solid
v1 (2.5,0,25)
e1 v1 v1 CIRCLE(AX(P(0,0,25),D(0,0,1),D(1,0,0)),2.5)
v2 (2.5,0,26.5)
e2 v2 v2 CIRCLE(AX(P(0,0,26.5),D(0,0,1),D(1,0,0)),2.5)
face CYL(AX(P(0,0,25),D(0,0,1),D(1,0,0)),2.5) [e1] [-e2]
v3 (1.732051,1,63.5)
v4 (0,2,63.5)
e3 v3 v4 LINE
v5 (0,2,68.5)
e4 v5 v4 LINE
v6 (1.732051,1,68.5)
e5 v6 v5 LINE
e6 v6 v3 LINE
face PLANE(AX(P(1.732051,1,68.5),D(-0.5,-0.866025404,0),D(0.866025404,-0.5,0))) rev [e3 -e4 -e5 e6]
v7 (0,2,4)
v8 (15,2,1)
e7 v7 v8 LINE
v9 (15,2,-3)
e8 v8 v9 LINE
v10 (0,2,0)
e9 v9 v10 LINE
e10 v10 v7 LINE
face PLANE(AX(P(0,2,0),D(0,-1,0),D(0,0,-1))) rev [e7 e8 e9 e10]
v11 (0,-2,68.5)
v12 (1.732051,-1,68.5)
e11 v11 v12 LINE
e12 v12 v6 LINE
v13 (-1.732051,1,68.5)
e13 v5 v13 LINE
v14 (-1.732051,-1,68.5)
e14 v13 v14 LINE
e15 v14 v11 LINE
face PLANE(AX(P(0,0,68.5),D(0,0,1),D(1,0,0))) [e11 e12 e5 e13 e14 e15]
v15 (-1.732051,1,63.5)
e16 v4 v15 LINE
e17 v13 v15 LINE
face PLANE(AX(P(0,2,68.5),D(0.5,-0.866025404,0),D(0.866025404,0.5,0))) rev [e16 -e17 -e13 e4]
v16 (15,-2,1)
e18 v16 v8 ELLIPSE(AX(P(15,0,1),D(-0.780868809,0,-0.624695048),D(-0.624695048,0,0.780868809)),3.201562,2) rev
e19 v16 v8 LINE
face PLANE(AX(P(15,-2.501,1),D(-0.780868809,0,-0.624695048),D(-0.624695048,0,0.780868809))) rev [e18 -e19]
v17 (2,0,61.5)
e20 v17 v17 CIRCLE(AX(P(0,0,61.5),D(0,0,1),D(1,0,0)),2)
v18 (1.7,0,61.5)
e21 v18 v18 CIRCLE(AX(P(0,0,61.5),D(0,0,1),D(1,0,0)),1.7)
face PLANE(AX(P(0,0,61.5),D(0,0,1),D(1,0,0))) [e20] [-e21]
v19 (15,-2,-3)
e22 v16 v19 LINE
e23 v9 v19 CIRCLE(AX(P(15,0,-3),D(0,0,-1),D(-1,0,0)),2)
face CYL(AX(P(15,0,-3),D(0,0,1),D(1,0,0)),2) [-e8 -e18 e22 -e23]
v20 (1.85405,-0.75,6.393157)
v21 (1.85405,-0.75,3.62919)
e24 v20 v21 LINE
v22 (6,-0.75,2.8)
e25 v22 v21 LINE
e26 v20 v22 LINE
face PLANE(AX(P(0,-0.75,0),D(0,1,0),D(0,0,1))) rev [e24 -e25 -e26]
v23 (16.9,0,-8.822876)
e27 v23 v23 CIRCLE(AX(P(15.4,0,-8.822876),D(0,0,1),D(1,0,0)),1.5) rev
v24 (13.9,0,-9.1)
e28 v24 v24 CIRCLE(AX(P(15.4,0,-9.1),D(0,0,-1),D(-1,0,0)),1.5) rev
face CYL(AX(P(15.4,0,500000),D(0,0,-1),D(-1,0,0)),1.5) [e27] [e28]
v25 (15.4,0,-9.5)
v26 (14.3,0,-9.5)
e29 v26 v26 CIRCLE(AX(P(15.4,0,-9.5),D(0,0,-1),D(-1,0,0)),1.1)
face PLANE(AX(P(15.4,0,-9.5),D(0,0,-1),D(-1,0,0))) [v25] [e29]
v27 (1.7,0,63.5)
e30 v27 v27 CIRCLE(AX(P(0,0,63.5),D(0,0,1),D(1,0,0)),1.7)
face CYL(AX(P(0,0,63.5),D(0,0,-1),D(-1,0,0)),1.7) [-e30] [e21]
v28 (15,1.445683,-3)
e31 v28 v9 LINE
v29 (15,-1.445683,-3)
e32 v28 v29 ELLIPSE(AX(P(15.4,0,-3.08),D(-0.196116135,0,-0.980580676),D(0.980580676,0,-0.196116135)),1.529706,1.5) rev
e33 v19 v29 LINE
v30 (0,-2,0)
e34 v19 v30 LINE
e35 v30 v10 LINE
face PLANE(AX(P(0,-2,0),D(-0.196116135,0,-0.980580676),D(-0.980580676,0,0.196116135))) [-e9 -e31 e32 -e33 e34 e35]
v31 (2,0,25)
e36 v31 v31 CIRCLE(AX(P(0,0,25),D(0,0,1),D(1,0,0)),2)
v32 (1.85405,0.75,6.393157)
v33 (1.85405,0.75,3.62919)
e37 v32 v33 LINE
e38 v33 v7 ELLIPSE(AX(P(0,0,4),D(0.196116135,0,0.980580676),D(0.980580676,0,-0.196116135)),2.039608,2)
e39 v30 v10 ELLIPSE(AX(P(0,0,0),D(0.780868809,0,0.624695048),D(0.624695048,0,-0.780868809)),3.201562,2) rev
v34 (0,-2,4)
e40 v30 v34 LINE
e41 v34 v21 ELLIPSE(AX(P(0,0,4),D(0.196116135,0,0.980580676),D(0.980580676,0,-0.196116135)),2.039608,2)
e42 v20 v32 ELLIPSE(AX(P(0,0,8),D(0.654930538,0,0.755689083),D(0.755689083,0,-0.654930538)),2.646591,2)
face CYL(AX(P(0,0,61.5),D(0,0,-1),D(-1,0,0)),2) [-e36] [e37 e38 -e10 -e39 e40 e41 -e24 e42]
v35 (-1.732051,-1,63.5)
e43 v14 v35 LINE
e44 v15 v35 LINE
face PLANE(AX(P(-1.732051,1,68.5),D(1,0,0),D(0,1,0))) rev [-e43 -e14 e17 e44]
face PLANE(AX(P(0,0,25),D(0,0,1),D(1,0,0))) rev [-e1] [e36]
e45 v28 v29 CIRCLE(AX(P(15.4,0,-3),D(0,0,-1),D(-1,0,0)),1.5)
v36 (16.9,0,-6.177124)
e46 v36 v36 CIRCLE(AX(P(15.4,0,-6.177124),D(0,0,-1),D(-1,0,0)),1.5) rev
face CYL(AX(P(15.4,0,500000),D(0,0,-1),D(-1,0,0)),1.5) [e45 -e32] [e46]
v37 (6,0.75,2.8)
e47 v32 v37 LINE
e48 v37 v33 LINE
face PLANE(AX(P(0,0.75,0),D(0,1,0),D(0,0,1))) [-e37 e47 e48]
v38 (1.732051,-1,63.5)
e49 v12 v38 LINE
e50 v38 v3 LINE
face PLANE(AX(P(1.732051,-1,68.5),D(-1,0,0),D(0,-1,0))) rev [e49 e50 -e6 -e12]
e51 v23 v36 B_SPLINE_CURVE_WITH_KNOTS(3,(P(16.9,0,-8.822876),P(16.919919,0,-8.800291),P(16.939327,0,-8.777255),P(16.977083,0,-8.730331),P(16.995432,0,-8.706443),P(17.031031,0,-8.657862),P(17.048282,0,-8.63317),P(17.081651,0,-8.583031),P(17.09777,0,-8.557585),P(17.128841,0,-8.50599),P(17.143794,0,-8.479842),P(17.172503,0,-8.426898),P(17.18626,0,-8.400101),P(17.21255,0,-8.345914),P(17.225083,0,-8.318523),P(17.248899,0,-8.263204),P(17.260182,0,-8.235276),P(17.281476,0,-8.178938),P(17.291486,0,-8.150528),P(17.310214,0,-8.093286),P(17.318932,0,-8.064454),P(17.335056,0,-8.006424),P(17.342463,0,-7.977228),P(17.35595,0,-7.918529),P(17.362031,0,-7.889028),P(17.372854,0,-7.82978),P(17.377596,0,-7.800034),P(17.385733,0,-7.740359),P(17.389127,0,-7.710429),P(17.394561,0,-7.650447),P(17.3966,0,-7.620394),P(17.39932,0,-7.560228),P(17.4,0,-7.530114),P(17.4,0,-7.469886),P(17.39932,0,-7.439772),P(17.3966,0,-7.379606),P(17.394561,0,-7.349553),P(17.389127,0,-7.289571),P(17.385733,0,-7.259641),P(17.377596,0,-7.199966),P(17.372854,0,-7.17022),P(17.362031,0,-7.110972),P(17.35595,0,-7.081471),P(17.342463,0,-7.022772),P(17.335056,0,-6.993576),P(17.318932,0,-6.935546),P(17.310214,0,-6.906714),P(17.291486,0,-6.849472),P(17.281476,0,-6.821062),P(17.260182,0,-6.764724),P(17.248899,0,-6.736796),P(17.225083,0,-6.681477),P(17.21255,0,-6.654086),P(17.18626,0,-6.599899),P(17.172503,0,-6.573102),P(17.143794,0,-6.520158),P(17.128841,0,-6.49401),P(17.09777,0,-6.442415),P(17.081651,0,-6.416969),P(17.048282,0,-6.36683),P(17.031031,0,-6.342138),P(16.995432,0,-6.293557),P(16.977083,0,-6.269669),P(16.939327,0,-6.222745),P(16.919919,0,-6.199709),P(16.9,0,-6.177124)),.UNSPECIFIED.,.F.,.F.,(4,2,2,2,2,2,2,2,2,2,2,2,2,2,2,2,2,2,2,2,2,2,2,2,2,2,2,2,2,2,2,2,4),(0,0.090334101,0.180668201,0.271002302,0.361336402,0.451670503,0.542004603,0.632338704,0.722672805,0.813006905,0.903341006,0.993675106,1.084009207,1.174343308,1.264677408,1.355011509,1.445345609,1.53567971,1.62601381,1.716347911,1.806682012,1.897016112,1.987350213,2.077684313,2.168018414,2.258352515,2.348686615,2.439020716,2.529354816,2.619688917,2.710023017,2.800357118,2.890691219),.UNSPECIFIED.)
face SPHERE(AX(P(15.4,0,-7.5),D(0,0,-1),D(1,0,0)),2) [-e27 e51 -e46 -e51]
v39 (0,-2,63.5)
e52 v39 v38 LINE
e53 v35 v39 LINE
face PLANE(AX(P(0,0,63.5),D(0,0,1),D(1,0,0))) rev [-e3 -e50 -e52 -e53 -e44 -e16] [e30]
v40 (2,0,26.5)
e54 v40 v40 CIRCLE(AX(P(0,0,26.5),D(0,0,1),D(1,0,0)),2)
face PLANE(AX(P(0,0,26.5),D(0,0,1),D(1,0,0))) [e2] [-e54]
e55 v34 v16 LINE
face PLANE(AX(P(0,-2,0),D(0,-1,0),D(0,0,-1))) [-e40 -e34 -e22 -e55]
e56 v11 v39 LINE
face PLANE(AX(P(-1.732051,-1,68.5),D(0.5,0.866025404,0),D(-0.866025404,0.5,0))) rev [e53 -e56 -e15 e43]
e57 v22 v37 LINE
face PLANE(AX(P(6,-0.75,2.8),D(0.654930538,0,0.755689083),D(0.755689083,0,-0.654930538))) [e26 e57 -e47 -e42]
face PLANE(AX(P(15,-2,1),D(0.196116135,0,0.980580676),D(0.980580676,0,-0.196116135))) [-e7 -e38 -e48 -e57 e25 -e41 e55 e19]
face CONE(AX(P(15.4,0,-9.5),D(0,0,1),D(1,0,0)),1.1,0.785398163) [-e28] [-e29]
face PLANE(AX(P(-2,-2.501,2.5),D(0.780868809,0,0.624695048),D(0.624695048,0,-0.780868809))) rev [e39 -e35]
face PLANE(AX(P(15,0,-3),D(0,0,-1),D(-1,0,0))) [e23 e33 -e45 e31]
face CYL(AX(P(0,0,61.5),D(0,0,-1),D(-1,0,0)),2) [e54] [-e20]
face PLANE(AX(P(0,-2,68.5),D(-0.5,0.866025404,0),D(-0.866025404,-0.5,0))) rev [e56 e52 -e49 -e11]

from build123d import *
from build123d.topology import SkipClean

# Parameters (mm, degrees)
SKETCH_1_R                  = 2
EXTRUDE_1_DEPTH             = 61.5
EXTRUDE_START               = -35
SKETCH_2_R                  = 2.5
EXTRUDE_2_DEPTH             = 1.5
SKETCH_3_R                  = 1.7
EXTRUDE_3_DEPTH             = 2
EXTRUDE_4_DEPTH             = 5
SKETCH_5_R                  = 2
EXTRUDE_5_DEPTH             = 4
EXTRUDE_6_DEPTH             = 2
EXTRUDE_6_DEPTH_BACK        = 2
CUT_EXTRUDE_1_REACH         = 72.721
SKETCH_8_R                  = 1.5
EXTRUDE_7_DEPTH             = 6.5
EXTRUDE_7_DIRECTION_2_REACH = 75.536
CHAMFER_1_SIZE              = 0.4
EXTRUDE_8_DEPTH             = 0.75
EXTRUDE_8_DEPTH_BACK        = 0.75


with BuildPart() as part:
    # 草图1 → 凸台-拉伸1 (new body)
    with BuildSketch(Plane.XY):
        Circle(SKETCH_1_R)
    extrude(amount=EXTRUDE_1_DEPTH)

    # 草图2 → 凸台-拉伸2 (add)
    with BuildSketch(Plane.XY.offset(61.5).offset(EXTRUDE_START)):
        Circle(SKETCH_2_R)
    extrude(amount=-EXTRUDE_2_DEPTH)

    # 草图3 → 凸台-拉伸3 (add)
    with BuildSketch(Plane.XY.offset(61.5)):
        Circle(SKETCH_3_R)
    extrude(amount=EXTRUDE_3_DEPTH)

    # 草图4 → 凸台-拉伸4 (add)
    with BuildSketch(Plane.XY.offset(63.5)):
        Polygon((0, 2), (-1.732050808, 1), (-1.732050808, -1), (0, -2), (1.732050808, -1), (1.732050808, 1), align=None)
    extrude(amount=EXTRUDE_4_DEPTH)



with BuildPart() as body_2:
    # 草图5 → 凸台-拉伸5 (new body)
    with BuildSketch(Plane(origin=(0, 0, 1), x_dir=(-1, 0, 0), z_dir=(0, 0, -1))):
        with Locations((-15, 0)):
            Circle(SKETCH_5_R)
    extrude(amount=EXTRUDE_5_DEPTH)


with BuildPart() as part_1:
    add(part.part)

    add(body_2.part)  # 凸台-拉伸6 merges body 2
    # 草图6 → 凸台-拉伸6 (add, two sides: drawn at the far end of the back side and taken through both)
    with BuildSketch(Plane(origin=(0, 0, 0), x_dir=(1, 0, 0), z_dir=(0, 1, 0)).offset(-EXTRUDE_6_DEPTH_BACK)):
        Polygon((0, 0), (15, 3), (15, -1), (0, -4), align=None)
    extrude(amount=EXTRUDE_6_DEPTH + EXTRUDE_6_DEPTH_BACK)

    # 草图7 → 切除-拉伸1 (cut, up to next)
    with BuildSketch(Plane(origin=(0, 2, 0), x_dir=(1, 0, 0), z_dir=(0, 1, 0)), mode=Mode.PRIVATE) as cut_extrude_1_sk1:
        Polygon((0, 0), (-2, 0), (-2, -2.5), align=None)
    cut_extrude_1_tool1 = extrude(cut_extrude_1_sk1.sketch, amount=-CUT_EXTRUDE_1_REACH, mode=Mode.PRIVATE) & part_1.part
    # 草图7 → 切除-拉伸1 (cut, up to next)
    with BuildSketch(Plane(origin=(0, 2, 0), x_dir=(1, 0, 0), z_dir=(0, 1, 0)), mode=Mode.PRIVATE) as cut_extrude_1_sk2:
        Polygon((15, -1), (17, 1.5), (17, -1), align=None)
    cut_extrude_1_tool2 = extrude(cut_extrude_1_sk2.sketch, amount=-CUT_EXTRUDE_1_REACH, mode=Mode.PRIVATE) & part_1.part
    # 草图7 → 切除-拉伸1 (cut, up to next)
    with BuildSketch(Plane(origin=(0, 2, 0), x_dir=(1, 0, 0), z_dir=(0, 1, 0)), mode=Mode.PRIVATE) as cut_extrude_1_sk3:
        Polygon((15, 3), (13, 2.6), (13, 3), align=None)
    cut_extrude_1_tool3 = extrude(cut_extrude_1_sk3.sketch, amount=-CUT_EXTRUDE_1_REACH, mode=Mode.PRIVATE) & part_1.part
    add(cut_extrude_1_tool1.solids().sort_by_distance((-1.333333, 2, 0.833333))[0], mode=Mode.SUBTRACT)
    add(cut_extrude_1_tool2.solids().sort_by_distance((16.333333, 2, 0.166667))[0], mode=Mode.SUBTRACT)
    add(cut_extrude_1_tool3.solids().sort_by_distance((13.666667, 2, -2.866667))[0], mode=Mode.SUBTRACT)

    # 草图8 → 凸台-拉伸7 (add)
    with BuildSketch(Plane(origin=(0, 0, -3), x_dir=(-1, 0, 0), z_dir=(0, 0, -1))):
        with Locations((-15.4, 0)):
            Circle(SKETCH_8_R)
    extrude(amount=EXTRUDE_7_DEPTH)

    # 草图8 → 凸台-拉伸7 direction 2 (add, up to next)
    with BuildSketch(Plane(origin=(0, 0, -3), x_dir=(-1, 0, 0), z_dir=(0, 0, -1)), mode=Mode.PRIVATE) as extrude_7_direction_2_sk1:
        with Locations((-15.4, 0)):
            Circle(SKETCH_8_R)
    extrude_7_direction_2_tool1 = extrude(extrude_7_direction_2_sk1.sketch, amount=-EXTRUDE_7_DIRECTION_2_REACH, mode=Mode.PRIVATE) - part_1.part
    add(extrude_7_direction_2_tool1.solids().sort_by_distance((15.4, 0, -3))[0])

    # 草图9 → 旋转1 (revolve)
    with SkipClean():  # the faces are left unmerged after this step: merging them gives an invalid solid
        with BuildSketch(Plane(origin=(0, 0, 0), x_dir=(1, 0, 0), z_dir=(0, 1, 0))):
            with BuildLine():
                Line((15.4, 9.5), (15.4, 7.5))
                Line((15.4, 7.5), (15.4, 5.5))
                ThreePointArc((15.4, 5.5), (17.4, 7.5), (15.4, 9.5))
            make_face()
        revolve(axis=Axis((15.4, 0, -9.5), (0, 0, 1)))
    add(part_1.part.scale(1), mode=Mode.REPLACE)  # the faces are merged on a copy

    # 倒角1
    chamfer_1_edges = [part_1.edges().sort_by_distance(p)[0] for p in [
        (16.9, 0, -9.5),
    ]]
    chamfer(chamfer_1_edges, length=CHAMFER_1_SIZE)

    # 草图10 → 凸台-拉伸8 (add, two sides: drawn at the far end of the back side and taken through both)
    with SkipClean():  # the faces are left unmerged after this step: merging them gives an invalid solid
        with BuildSketch(Plane(origin=(0, 0, 0), x_dir=(1, 0, 0), z_dir=(0, 1, 0)).offset(-EXTRUDE_8_DEPTH_BACK)):
            Polygon((0, -2), (0, -8), (6, -2.8), (8, -1.066666667), align=None)
        extrude(amount=EXTRUDE_8_DEPTH + EXTRUDE_8_DEPTH_BACK)


solid = part_1.part
